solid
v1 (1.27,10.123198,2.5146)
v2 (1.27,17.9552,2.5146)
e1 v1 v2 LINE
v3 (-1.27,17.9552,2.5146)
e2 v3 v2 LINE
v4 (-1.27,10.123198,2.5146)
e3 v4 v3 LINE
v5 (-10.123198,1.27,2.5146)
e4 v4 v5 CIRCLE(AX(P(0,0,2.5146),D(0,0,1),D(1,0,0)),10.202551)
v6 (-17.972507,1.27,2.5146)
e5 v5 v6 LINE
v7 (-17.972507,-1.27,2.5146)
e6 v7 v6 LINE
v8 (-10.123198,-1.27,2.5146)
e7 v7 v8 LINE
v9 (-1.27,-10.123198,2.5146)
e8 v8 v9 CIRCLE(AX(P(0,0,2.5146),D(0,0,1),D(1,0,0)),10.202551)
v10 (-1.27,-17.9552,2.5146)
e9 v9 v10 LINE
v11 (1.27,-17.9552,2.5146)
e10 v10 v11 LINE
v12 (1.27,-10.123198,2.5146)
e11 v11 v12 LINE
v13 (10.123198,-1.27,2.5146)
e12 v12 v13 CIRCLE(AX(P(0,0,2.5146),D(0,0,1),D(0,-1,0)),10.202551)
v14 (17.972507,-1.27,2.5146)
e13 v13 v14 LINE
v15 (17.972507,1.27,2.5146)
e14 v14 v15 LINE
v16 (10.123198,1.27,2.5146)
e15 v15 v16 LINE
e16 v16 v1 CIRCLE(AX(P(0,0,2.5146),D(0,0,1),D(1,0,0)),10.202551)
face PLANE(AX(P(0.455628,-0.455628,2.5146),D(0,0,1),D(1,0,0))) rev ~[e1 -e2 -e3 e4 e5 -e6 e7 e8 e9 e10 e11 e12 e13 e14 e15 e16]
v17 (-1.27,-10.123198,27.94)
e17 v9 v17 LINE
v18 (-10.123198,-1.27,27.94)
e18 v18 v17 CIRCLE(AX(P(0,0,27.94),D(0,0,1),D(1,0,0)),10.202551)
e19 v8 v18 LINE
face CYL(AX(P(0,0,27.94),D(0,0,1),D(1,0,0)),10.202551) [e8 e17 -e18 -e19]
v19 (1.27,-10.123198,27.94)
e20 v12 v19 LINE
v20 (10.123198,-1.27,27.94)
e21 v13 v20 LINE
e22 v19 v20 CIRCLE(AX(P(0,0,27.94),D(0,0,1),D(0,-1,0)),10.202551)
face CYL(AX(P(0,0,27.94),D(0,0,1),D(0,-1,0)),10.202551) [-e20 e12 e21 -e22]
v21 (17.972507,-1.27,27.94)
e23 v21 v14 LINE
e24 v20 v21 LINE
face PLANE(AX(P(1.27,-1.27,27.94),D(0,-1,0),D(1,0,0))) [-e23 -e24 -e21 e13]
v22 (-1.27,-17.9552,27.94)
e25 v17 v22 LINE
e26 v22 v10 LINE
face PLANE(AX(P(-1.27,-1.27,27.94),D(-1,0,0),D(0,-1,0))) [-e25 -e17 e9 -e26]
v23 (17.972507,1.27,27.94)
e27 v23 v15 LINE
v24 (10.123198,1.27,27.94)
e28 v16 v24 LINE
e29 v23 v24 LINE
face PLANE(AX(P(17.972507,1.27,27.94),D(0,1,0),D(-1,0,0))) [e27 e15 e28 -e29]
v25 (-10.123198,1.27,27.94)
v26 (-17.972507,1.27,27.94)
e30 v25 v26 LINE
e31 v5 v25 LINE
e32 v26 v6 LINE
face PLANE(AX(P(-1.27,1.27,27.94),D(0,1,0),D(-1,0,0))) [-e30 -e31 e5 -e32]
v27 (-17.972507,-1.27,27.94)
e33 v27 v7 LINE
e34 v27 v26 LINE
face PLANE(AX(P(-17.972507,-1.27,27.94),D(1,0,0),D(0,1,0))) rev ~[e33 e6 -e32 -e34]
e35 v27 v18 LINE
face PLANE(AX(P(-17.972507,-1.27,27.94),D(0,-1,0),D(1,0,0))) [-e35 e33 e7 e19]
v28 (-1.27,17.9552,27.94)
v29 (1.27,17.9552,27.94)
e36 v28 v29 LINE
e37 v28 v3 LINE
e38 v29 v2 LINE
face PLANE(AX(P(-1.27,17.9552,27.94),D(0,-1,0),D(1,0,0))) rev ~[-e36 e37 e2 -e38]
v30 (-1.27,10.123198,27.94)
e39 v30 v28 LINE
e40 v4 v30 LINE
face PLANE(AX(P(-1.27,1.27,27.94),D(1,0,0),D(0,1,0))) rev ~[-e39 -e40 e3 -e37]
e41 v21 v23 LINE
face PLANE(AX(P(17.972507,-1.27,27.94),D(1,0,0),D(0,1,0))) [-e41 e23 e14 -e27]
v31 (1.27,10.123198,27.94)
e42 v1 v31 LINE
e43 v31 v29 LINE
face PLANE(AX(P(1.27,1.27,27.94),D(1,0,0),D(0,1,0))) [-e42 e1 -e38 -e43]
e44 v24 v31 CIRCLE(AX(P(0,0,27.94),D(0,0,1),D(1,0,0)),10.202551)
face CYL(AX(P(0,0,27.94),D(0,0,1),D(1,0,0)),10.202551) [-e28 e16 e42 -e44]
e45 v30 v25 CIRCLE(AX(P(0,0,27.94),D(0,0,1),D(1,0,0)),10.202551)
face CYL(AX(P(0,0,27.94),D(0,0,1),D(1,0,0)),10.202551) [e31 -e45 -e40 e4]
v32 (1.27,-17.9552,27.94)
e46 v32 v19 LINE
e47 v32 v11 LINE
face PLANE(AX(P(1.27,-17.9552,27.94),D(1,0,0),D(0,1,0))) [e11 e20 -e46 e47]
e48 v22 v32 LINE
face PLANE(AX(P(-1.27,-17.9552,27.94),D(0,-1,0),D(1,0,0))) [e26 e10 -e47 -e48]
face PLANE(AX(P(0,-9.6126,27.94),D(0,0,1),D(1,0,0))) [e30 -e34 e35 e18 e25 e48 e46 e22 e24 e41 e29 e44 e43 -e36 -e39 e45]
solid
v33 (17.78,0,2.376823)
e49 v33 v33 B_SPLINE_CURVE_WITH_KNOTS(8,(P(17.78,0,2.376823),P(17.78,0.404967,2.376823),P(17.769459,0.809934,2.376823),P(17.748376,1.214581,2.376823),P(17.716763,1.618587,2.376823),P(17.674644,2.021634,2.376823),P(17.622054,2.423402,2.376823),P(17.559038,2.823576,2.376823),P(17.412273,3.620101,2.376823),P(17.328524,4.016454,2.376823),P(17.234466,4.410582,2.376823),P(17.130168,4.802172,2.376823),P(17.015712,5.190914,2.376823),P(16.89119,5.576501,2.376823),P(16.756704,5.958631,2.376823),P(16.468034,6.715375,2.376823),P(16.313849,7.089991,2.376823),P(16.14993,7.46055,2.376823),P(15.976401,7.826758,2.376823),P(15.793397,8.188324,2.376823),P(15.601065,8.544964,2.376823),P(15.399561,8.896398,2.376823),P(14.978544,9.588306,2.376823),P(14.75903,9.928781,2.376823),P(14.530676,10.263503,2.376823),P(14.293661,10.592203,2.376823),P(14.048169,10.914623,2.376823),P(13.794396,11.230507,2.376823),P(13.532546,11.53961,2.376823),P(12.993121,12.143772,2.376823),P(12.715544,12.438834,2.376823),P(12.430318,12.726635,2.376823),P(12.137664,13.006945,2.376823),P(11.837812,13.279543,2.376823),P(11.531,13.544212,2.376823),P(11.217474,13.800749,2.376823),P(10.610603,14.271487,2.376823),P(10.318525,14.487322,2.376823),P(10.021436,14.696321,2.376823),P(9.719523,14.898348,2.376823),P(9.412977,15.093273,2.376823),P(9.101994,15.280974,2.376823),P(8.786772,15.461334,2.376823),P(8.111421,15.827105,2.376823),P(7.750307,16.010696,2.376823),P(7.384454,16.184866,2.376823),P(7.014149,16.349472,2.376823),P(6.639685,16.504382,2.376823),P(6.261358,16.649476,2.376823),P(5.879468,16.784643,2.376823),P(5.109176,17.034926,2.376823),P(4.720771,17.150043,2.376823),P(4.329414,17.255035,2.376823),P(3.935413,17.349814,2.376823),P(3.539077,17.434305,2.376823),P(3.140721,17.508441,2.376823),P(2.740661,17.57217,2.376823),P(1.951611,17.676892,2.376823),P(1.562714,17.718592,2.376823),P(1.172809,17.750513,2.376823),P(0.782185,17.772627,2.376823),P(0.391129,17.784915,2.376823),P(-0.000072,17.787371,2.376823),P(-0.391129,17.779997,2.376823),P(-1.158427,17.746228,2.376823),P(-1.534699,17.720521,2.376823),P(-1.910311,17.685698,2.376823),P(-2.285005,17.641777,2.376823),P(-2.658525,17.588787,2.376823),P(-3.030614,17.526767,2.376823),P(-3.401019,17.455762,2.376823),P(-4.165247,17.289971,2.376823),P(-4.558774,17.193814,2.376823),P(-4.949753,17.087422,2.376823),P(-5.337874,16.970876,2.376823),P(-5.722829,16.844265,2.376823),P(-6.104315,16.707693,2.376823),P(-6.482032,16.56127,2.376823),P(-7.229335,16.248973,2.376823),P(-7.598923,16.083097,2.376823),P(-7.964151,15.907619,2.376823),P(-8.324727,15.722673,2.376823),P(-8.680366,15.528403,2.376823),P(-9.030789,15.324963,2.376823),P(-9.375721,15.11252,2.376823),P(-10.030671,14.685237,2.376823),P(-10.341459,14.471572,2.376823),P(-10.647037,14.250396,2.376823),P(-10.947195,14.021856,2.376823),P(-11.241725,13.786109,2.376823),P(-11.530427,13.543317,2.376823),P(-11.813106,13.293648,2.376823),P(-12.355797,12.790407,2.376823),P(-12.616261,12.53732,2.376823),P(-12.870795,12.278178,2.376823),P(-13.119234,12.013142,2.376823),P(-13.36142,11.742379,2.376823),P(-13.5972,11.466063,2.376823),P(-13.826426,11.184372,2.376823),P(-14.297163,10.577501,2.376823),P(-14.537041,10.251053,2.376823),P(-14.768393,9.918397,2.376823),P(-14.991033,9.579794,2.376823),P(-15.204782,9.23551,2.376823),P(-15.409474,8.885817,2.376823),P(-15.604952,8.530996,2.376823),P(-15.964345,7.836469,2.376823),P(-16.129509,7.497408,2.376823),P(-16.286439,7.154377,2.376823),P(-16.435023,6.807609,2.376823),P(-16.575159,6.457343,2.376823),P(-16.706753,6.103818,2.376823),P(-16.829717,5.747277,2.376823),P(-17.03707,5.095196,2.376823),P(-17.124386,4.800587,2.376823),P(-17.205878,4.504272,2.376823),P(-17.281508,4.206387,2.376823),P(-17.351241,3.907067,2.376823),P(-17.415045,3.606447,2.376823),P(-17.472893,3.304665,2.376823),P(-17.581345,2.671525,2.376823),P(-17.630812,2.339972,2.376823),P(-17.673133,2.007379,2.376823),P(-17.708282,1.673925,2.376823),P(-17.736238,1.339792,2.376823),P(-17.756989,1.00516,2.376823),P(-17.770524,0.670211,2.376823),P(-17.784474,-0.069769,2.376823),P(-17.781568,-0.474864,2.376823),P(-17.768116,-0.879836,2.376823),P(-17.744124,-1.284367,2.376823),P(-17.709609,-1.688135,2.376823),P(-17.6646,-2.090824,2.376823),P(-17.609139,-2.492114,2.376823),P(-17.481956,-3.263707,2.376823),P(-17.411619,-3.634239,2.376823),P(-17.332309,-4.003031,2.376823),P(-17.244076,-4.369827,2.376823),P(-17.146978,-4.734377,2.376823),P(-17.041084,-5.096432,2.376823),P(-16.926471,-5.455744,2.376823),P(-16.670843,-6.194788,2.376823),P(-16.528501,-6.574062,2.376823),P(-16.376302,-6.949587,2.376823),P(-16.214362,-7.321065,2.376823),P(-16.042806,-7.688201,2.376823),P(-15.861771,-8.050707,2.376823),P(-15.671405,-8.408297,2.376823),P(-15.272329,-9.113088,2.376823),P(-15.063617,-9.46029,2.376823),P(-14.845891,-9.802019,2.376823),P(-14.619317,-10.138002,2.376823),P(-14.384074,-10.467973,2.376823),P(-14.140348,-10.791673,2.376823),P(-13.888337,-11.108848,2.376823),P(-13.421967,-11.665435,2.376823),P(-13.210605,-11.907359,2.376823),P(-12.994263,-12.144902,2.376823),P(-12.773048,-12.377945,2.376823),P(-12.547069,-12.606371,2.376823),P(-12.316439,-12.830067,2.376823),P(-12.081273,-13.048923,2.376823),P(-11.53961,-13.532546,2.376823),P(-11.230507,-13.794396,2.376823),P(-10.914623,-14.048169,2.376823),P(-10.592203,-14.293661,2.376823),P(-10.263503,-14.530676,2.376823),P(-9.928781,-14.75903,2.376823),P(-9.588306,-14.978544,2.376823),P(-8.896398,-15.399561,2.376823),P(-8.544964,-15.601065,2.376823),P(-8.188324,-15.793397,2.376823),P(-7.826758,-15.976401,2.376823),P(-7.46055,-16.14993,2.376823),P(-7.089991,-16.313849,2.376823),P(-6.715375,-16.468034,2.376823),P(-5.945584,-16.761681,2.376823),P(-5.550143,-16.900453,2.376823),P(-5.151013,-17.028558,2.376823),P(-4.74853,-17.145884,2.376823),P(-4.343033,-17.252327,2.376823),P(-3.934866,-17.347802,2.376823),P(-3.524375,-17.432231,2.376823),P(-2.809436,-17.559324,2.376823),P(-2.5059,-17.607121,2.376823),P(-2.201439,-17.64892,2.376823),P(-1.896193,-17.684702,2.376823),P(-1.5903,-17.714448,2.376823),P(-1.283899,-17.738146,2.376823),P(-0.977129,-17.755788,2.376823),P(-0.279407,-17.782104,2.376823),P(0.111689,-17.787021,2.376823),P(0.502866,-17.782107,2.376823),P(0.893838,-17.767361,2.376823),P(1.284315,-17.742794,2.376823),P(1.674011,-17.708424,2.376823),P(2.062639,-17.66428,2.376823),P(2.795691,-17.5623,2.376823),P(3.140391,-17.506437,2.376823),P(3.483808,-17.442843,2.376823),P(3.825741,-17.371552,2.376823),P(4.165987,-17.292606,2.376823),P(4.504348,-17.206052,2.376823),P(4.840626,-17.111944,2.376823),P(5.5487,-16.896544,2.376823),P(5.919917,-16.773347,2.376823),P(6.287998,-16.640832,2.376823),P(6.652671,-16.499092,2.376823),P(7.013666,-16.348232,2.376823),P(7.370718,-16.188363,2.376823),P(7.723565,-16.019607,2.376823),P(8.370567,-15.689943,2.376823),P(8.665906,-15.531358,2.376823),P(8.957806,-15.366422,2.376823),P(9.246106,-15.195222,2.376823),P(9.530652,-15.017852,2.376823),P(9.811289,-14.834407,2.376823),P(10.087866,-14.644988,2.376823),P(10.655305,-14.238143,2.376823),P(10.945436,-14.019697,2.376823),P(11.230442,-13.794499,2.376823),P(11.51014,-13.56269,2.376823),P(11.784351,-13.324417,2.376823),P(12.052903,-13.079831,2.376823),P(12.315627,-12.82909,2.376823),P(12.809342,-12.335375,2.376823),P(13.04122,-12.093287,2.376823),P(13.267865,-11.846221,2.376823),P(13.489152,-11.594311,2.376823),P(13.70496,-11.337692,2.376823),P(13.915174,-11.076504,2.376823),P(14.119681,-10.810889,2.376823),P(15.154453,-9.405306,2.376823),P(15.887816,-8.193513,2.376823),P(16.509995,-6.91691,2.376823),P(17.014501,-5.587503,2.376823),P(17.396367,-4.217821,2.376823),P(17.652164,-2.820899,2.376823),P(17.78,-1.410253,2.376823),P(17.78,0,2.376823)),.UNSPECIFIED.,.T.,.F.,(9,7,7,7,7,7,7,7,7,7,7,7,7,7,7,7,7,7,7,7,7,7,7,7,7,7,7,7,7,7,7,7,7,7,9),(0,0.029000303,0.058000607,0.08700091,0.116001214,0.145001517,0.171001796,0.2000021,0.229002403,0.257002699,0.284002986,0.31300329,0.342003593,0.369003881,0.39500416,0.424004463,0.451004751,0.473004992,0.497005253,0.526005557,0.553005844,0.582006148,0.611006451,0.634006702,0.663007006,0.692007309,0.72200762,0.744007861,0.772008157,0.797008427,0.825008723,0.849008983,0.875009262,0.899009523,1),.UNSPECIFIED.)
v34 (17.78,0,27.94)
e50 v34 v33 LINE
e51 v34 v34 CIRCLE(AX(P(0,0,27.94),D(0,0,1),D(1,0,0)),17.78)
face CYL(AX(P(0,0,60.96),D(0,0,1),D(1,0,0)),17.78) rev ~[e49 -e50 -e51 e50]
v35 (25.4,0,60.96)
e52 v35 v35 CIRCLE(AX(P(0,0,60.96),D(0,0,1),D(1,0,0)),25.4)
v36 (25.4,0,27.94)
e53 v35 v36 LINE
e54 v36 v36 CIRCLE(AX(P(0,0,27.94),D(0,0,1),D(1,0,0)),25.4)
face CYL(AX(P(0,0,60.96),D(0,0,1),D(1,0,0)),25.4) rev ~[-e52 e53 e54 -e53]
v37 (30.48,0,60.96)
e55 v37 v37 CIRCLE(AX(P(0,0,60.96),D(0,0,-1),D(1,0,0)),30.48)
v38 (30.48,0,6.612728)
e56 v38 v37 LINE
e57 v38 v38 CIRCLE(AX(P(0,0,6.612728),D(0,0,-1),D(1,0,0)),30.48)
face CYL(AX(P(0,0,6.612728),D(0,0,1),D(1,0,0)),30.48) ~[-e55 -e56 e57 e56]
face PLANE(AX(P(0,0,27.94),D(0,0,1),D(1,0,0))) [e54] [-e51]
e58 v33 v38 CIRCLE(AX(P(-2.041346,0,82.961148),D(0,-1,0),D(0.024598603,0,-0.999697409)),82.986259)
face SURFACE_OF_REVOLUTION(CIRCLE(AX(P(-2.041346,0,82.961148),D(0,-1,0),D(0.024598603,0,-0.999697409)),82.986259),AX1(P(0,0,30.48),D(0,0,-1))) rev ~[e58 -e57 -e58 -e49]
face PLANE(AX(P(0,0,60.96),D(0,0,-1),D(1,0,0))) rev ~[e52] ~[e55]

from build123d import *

# Parameters (mm, degrees)
F2_R     = 25.4
F2_R_2   = 17.78
F3_DEPTH = 33.02
F4_DEPTH = 60.96
F5_W     = 2.54
F5_H     = 16.6851995905
F5_H_2   = 2.54
F5_W_2   = 16.7025072155
F6_DEPTH = 25.4254
F8_DEPTH = 25.4254


# Not quite as in the source:
# - a feature names something its author has since deleted; it is built from what else it names


with BuildPart() as f1:
    # F0 (on Front) → F1 (revolve)
    with BuildSketch(Plane.XZ):
        with BuildLine():
            Line((30.48, 60.96), (0, 60.96))
            Line((0, 60.96), (0, 0))
            ThreePointArc((0, 0), (15.5534533119, 1.861565962), (30.48, 6.6127281069))
            Line((30.48, 6.6127281069), (30.48, 60.96))
        make_face()
    revolve(axis=Axis((0, 0, 30.48), (0, 0, -1)))

    # F2 (on face) → F3 (cut)
    with BuildSketch(Plane.XY.offset(60.96)):
        Circle(F2_R)
        Circle(F2_R_2, mode=Mode.SUBTRACT)
    extrude(amount=-F3_DEPTH, mode=Mode.SUBTRACT)

    # F4 (cut): a face of the model
    f4_faces = [f1.faces().sort_by_distance(p)[0] for p in [
        (0, 0, 60.96),
    ]]
    extrude(f4_faces, amount=-F4_DEPTH, mode=Mode.SUBTRACT)


with BuildPart() as f6:
    # F5 (on face) → F6 (new body)
    with BuildSketch(Plane.XY.offset(27.94)):
        with Locations((0, -9.6125997952)):
            Rectangle(F5_W, F5_H)
        Rectangle(F5_W, F5_H_2)
        with Locations((9.6212536077, 0)):
            Rectangle(F5_W_2, F5_H_2)
        with Locations((-9.6212536077, 0)):
            Rectangle(F5_W_2, F5_H_2)
        with Locations((0, 9.6125997952)):
            Rectangle(F5_W, F5_H)
    extrude(amount=-F6_DEPTH)

    # F7 (on face) → F8 (join)
    with BuildSketch(Plane.XY.offset(27.94)):
        with BuildLine():
            ThreePointArc((0, -10.2025506097), (7.2142927215, -7.2142927215), (10.2025506097, 0))
            ThreePointArc((10.2025506097, 0), (-7.2142927215, 7.2142927215), (0, -10.2025506097))
        make_face()
    extrude(amount=-F8_DEPTH)


solid = Compound([f1.part, f6.part])
